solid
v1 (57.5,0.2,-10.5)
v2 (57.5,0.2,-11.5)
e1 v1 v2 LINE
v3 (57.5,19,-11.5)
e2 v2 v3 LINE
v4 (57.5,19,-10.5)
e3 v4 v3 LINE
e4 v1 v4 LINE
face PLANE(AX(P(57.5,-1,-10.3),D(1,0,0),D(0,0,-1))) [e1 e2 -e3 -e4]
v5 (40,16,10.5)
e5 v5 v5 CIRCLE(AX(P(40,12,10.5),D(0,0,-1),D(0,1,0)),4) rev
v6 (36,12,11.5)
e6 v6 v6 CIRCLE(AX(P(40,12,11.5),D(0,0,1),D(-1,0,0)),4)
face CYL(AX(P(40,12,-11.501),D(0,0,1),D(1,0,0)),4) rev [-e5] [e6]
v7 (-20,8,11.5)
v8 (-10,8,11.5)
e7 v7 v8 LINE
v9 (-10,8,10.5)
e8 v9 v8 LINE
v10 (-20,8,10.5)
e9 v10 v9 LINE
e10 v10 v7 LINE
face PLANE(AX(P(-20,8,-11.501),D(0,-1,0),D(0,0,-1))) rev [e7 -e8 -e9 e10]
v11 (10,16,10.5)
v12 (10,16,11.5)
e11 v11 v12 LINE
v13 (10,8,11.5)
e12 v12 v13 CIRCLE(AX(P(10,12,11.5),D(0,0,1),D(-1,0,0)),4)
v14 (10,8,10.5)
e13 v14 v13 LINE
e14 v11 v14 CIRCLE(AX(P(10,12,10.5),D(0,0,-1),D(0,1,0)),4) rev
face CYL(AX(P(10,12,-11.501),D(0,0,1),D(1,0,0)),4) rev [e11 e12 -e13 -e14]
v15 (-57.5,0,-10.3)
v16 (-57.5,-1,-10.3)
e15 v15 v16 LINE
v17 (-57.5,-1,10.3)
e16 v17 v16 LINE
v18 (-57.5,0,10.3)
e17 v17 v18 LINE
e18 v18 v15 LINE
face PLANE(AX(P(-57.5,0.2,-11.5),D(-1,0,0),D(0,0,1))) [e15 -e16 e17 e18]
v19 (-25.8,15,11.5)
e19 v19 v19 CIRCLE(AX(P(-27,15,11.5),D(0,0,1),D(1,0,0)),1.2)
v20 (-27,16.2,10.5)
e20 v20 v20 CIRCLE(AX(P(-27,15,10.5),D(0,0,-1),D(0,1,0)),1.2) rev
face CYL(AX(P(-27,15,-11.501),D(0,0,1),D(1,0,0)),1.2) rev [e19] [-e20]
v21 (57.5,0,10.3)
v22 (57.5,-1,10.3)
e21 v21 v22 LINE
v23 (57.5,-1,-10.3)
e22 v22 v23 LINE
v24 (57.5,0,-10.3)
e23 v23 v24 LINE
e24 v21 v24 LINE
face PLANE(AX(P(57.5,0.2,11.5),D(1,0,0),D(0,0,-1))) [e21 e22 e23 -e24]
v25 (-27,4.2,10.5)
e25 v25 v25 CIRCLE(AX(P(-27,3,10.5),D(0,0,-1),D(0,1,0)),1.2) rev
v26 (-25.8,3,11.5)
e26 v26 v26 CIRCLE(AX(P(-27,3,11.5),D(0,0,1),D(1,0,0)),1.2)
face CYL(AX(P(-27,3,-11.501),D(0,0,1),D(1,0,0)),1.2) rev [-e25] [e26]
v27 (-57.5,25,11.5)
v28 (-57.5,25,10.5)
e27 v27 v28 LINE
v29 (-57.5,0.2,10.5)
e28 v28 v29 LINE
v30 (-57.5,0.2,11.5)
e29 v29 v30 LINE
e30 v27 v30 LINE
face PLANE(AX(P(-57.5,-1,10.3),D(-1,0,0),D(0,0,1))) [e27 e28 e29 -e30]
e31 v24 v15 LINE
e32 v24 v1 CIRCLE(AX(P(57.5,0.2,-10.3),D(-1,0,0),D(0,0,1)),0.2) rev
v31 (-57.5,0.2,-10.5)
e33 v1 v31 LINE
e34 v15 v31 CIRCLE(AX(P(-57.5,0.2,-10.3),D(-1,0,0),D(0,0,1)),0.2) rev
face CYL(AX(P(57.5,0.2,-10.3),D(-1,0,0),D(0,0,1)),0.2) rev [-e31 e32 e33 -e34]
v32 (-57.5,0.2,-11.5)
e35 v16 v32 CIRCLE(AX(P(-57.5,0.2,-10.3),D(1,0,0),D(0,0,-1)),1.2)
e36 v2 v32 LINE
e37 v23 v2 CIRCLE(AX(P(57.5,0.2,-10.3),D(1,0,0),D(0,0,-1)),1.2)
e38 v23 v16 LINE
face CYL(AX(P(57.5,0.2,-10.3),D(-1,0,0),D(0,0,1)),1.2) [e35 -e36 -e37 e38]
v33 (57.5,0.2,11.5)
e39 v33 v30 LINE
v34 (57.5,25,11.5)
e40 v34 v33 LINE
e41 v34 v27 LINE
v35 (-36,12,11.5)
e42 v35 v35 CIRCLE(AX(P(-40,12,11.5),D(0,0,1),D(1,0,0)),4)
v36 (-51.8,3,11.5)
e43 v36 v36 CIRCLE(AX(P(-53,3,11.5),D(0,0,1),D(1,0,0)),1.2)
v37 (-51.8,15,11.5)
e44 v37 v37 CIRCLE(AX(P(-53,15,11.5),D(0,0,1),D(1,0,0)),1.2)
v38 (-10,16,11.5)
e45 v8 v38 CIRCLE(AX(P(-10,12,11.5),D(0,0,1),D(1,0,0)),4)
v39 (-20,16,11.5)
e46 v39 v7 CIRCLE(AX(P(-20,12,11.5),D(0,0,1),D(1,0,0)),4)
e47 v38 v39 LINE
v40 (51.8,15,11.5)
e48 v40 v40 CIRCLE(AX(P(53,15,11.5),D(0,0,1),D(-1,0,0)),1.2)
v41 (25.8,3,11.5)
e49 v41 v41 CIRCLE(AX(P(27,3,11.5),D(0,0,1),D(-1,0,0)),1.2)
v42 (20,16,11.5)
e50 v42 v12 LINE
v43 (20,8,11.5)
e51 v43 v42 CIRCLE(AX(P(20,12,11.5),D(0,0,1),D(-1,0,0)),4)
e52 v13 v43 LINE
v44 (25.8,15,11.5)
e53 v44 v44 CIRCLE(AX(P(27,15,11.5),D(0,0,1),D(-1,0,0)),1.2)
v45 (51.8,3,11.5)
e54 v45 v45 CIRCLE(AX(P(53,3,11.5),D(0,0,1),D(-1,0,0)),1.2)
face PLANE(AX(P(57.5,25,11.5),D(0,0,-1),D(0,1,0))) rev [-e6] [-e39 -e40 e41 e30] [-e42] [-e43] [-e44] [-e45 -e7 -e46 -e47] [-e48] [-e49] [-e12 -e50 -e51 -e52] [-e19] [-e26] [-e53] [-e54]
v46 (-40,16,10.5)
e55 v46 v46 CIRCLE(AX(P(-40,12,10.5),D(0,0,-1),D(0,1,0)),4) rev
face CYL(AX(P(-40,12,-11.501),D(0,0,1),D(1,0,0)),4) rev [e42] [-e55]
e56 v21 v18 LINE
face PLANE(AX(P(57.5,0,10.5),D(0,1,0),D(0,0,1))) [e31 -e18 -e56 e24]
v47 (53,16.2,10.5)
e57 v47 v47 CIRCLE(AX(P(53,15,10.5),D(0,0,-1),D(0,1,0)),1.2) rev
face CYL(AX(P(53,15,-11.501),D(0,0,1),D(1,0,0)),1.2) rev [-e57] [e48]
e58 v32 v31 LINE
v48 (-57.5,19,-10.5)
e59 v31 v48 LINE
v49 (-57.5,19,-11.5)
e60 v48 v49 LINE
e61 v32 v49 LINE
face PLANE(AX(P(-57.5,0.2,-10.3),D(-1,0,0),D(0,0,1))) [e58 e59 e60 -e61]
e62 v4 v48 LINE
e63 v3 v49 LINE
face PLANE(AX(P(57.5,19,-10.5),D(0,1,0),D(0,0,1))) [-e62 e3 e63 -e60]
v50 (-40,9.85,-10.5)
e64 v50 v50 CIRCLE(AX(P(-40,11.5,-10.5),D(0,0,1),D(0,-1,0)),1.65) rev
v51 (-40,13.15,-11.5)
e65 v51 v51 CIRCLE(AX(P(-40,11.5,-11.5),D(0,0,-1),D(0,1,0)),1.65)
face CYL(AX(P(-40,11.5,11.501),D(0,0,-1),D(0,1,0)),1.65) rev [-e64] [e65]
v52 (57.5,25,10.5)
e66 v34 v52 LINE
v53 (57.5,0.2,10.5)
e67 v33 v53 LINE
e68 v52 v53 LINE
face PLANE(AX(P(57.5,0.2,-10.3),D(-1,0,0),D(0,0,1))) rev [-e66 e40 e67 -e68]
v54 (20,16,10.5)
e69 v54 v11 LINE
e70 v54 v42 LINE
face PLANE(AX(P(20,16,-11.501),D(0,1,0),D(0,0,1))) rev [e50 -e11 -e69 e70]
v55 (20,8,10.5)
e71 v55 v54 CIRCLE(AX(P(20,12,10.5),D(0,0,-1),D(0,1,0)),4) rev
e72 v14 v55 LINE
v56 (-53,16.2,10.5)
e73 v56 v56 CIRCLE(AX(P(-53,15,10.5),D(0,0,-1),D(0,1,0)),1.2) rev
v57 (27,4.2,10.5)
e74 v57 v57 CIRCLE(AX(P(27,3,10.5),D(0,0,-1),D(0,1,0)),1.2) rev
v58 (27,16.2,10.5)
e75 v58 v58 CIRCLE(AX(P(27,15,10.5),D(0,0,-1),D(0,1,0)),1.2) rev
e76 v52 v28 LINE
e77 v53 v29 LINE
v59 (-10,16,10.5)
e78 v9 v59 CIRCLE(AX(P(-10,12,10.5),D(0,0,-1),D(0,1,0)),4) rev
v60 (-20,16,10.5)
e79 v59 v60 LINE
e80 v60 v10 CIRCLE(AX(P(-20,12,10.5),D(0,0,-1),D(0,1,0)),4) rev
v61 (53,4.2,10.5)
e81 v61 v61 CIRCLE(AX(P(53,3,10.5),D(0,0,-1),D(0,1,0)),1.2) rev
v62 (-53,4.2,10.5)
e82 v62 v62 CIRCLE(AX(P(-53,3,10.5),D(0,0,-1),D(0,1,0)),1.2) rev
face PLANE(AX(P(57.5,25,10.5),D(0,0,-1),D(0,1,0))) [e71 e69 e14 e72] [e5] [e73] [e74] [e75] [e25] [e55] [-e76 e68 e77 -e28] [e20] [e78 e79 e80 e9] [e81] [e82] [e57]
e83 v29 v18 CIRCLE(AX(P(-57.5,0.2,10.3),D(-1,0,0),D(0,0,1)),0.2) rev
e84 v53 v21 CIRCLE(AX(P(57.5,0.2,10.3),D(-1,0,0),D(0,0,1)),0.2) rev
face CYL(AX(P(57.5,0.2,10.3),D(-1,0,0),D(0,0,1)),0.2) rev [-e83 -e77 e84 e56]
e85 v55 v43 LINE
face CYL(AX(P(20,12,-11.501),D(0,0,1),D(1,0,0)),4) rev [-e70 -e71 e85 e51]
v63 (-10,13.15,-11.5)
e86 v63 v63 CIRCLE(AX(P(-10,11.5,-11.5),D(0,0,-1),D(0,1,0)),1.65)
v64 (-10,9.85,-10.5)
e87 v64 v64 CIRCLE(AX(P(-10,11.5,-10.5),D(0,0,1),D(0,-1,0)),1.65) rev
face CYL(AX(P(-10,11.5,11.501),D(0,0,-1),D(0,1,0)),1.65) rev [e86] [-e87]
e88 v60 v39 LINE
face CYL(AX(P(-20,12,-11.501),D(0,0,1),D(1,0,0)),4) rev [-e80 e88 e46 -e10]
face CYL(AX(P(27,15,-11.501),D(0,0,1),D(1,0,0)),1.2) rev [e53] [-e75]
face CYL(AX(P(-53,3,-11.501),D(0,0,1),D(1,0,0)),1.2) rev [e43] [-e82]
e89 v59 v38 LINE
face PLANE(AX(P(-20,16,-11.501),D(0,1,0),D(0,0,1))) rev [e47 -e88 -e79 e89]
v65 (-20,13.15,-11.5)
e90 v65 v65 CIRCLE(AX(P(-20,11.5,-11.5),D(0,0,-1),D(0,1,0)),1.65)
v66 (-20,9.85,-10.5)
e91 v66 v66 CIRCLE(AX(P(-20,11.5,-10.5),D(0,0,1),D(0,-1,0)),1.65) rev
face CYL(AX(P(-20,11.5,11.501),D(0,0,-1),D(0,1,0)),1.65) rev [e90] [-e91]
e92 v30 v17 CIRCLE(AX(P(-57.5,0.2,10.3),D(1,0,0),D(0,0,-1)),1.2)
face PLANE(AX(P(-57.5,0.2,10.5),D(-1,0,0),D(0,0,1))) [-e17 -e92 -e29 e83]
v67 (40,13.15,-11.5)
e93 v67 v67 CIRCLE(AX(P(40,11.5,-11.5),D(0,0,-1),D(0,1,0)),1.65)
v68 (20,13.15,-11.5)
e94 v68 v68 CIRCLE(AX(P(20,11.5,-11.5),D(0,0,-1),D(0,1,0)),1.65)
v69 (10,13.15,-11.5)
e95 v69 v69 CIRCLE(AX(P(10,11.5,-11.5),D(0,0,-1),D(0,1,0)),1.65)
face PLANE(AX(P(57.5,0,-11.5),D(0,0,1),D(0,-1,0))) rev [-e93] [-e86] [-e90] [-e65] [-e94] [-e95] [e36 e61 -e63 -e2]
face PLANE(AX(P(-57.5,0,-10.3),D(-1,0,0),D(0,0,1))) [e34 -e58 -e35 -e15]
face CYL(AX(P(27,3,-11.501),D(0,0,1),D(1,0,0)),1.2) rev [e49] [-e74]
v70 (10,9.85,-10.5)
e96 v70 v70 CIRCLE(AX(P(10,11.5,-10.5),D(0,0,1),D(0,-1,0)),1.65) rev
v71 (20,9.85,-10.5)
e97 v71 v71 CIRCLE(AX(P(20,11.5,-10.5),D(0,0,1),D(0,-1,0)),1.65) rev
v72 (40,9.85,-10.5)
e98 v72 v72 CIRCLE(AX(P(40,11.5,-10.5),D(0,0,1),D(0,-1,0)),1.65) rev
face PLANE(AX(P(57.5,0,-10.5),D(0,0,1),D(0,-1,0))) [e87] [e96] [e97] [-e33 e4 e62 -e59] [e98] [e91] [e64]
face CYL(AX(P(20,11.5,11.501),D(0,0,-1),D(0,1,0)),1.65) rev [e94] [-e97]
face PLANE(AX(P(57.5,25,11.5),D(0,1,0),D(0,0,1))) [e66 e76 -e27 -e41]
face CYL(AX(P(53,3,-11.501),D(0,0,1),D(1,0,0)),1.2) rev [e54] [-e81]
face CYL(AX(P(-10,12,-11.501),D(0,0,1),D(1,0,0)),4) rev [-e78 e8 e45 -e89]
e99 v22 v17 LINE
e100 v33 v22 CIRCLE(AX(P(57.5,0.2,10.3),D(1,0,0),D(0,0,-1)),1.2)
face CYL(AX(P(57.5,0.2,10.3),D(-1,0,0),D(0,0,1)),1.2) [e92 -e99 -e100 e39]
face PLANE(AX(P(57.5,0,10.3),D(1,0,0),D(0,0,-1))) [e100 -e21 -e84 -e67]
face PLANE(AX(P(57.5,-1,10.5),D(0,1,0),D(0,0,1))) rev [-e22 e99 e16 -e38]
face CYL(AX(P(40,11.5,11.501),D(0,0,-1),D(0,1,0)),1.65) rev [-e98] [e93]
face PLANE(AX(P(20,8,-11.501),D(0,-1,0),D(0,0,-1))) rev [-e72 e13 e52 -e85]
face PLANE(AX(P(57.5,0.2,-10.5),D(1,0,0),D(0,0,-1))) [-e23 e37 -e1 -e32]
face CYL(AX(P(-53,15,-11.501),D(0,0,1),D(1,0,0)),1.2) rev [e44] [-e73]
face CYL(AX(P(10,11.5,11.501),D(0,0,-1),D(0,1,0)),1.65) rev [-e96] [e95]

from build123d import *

# Parameters (mm, degrees)
BASIS_BLECH1_DEPTH              = 57.5
SCHNITT_LINEAR_AUSTRAGEN1_REACH = 68.785
SKIZZE6_R                       = 4
SKIZZE6_R_2                     = 1.2
SCHNITT_LINEAR_AUSTRAGEN2_REACH = 68.785
SKIZZE7_R                       = 1.65


# Sheet-metal steps are written as plain solids
with BuildPart() as part:
    # Skizze1 → Basis-Blech1 (new, symmetric)
    with BuildSketch(Plane(origin=(0, 0, 0), x_dir=(0, 0, -1), z_dir=(1, 0, 0))):
        with BuildLine():
            Line((-10.5, 25), (-10.5, 0.2))
            ThreePointArc((-10.5, 0.2), (-10.441421356, 0.058578644), (-10.3, 0))
            Line((-10.3, 0), (10.3, 0))
            ThreePointArc((10.3, 0), (10.441421356, 0.058578644), (10.5, 0.2))
            Line((10.5, 0.2), (10.5, 19))
            Line((10.5, 19), (11.5, 19))
            Line((11.5, 19), (11.5, 0.2))
            ThreePointArc((11.5, 0.2), (11.148528137, -0.648528137), (10.3, -1))
            Line((10.3, -1), (-10.3, -1))
            ThreePointArc((-10.3, -1), (-11.148528137, -0.648528137), (-11.5, 0.2))
            Line((-11.5, 0.2), (-11.5, 25))
            Line((-11.5, 25), (-10.5, 25))
        make_face()
    extrude(amount=BASIS_BLECH1_DEPTH, both=True)

    # Skizze6 → Schnitt-Linear austragen1 (cut, up to next)
    with BuildSketch(Plane.XY.offset(11.5), mode=Mode.PRIVATE) as schnitt_linear_austragen1_sk1:
        with Locations((-40, 12)):
            Circle(SKIZZE6_R)
    schnitt_linear_austragen1_tool1 = extrude(schnitt_linear_austragen1_sk1.sketch, amount=-SCHNITT_LINEAR_AUSTRAGEN1_REACH, mode=Mode.PRIVATE) & part.part
    # Skizze6 → Schnitt-Linear austragen1 (cut, up to next)
    with BuildSketch(Plane.XY.offset(11.5), mode=Mode.PRIVATE) as schnitt_linear_austragen1_sk2:
        with Locations((-53, 15)):
            Circle(SKIZZE6_R_2)
    schnitt_linear_austragen1_tool2 = extrude(schnitt_linear_austragen1_sk2.sketch, amount=-SCHNITT_LINEAR_AUSTRAGEN1_REACH, mode=Mode.PRIVATE) & part.part
    # Skizze6 → Schnitt-Linear austragen1 (cut, up to next)
    with BuildSketch(Plane.XY.offset(11.5), mode=Mode.PRIVATE) as schnitt_linear_austragen1_sk3:
        with Locations((-53, 3)):
            Circle(SKIZZE6_R_2)
    schnitt_linear_austragen1_tool3 = extrude(schnitt_linear_austragen1_sk3.sketch, amount=-SCHNITT_LINEAR_AUSTRAGEN1_REACH, mode=Mode.PRIVATE) & part.part
    # Skizze6 → Schnitt-Linear austragen1 (cut, up to next)
    with BuildSketch(Plane.XY.offset(11.5), mode=Mode.PRIVATE) as schnitt_linear_austragen1_sk4:
        with Locations((-27, 15)):
            Circle(SKIZZE6_R_2)
    schnitt_linear_austragen1_tool4 = extrude(schnitt_linear_austragen1_sk4.sketch, amount=-SCHNITT_LINEAR_AUSTRAGEN1_REACH, mode=Mode.PRIVATE) & part.part
    # Skizze6 → Schnitt-Linear austragen1 (cut, up to next)
    with BuildSketch(Plane.XY.offset(11.5), mode=Mode.PRIVATE) as schnitt_linear_austragen1_sk5:
        with Locations((-27, 3)):
            Circle(SKIZZE6_R_2)
    schnitt_linear_austragen1_tool5 = extrude(schnitt_linear_austragen1_sk5.sketch, amount=-SCHNITT_LINEAR_AUSTRAGEN1_REACH, mode=Mode.PRIVATE) & part.part
    # Skizze6 → Schnitt-Linear austragen1 (cut, up to next)
    with BuildSketch(Plane.XY.offset(11.5), mode=Mode.PRIVATE) as schnitt_linear_austragen1_sk6:
        with Locations(Location((53, 3, 0), (0, 0, 90))):
            Circle(SKIZZE6_R_2)
    schnitt_linear_austragen1_tool6 = extrude(schnitt_linear_austragen1_sk6.sketch, amount=-SCHNITT_LINEAR_AUSTRAGEN1_REACH, mode=Mode.PRIVATE) & part.part
    # Skizze6 → Schnitt-Linear austragen1 (cut, up to next)
    with BuildSketch(Plane.XY.offset(11.5), mode=Mode.PRIVATE) as schnitt_linear_austragen1_sk7:
        with Locations(Location((27, 3, 0), (0, 0, 90))):
            Circle(SKIZZE6_R_2)
    schnitt_linear_austragen1_tool7 = extrude(schnitt_linear_austragen1_sk7.sketch, amount=-SCHNITT_LINEAR_AUSTRAGEN1_REACH, mode=Mode.PRIVATE) & part.part
    # Skizze6 → Schnitt-Linear austragen1 (cut, up to next)
    with BuildSketch(Plane.XY.offset(11.5), mode=Mode.PRIVATE) as schnitt_linear_austragen1_sk8:
        with Locations(Location((27, 15, 0), (0, 0, 90))):
            Circle(SKIZZE6_R_2)
    schnitt_linear_austragen1_tool8 = extrude(schnitt_linear_austragen1_sk8.sketch, amount=-SCHNITT_LINEAR_AUSTRAGEN1_REACH, mode=Mode.PRIVATE) & part.part
    # Skizze6 → Schnitt-Linear austragen1 (cut, up to next)
    with BuildSketch(Plane.XY.offset(11.5), mode=Mode.PRIVATE) as schnitt_linear_austragen1_sk9:
        with Locations(Location((40, 12, 0), (0, 0, 90))):
            Circle(SKIZZE6_R)
    schnitt_linear_austragen1_tool9 = extrude(schnitt_linear_austragen1_sk9.sketch, amount=-SCHNITT_LINEAR_AUSTRAGEN1_REACH, mode=Mode.PRIVATE) & part.part
    # Skizze6 → Schnitt-Linear austragen1 (cut, up to next)
    with BuildSketch(Plane.XY.offset(11.5), mode=Mode.PRIVATE) as schnitt_linear_austragen1_sk10:
        with Locations(Location((53, 15, 0), (0, 0, 90))):
            Circle(SKIZZE6_R_2)
    schnitt_linear_austragen1_tool10 = extrude(schnitt_linear_austragen1_sk10.sketch, amount=-SCHNITT_LINEAR_AUSTRAGEN1_REACH, mode=Mode.PRIVATE) & part.part
    # Skizze6 → Schnitt-Linear austragen1 (cut, up to next)
    with BuildSketch(Plane.XY.offset(11.5), mode=Mode.PRIVATE) as schnitt_linear_austragen1_sk11:
        with BuildLine():
            Line((-20, 16), (-10, 16))
            ThreePointArc((-10, 16), (-6, 12), (-10, 8))
            Line((-10, 8), (-20, 8))
            ThreePointArc((-20, 8), (-24, 12), (-20, 16))
        make_face()
    schnitt_linear_austragen1_tool11 = extrude(schnitt_linear_austragen1_sk11.sketch, amount=-SCHNITT_LINEAR_AUSTRAGEN1_REACH, mode=Mode.PRIVATE) & part.part
    # Skizze6 → Schnitt-Linear austragen1 (cut, up to next)
    with BuildSketch(Plane.XY.offset(11.5), mode=Mode.PRIVATE) as schnitt_linear_austragen1_sk12:
        with BuildLine():
            Line((20, 16), (10, 16))
            ThreePointArc((10, 16), (6, 12), (10, 8))
            Line((10, 8), (20, 8))
            ThreePointArc((20, 8), (24, 12), (20, 16))
        make_face()
    schnitt_linear_austragen1_tool12 = extrude(schnitt_linear_austragen1_sk12.sketch, amount=-SCHNITT_LINEAR_AUSTRAGEN1_REACH, mode=Mode.PRIVATE) & part.part
    add(schnitt_linear_austragen1_tool1.solids().sort_by_distance((-40, 12, 11.5))[0], mode=Mode.SUBTRACT)
    add(schnitt_linear_austragen1_tool2.solids().sort_by_distance((-53, 15, 11.5))[0], mode=Mode.SUBTRACT)
    add(schnitt_linear_austragen1_tool3.solids().sort_by_distance((-53, 3, 11.5))[0], mode=Mode.SUBTRACT)
    add(schnitt_linear_austragen1_tool4.solids().sort_by_distance((-27, 15, 11.5))[0], mode=Mode.SUBTRACT)
    add(schnitt_linear_austragen1_tool5.solids().sort_by_distance((-27, 3, 11.5))[0], mode=Mode.SUBTRACT)
    add(schnitt_linear_austragen1_tool6.solids().sort_by_distance((53, 3, 11.5))[0], mode=Mode.SUBTRACT)
    add(schnitt_linear_austragen1_tool7.solids().sort_by_distance((27, 3, 11.5))[0], mode=Mode.SUBTRACT)
    add(schnitt_linear_austragen1_tool8.solids().sort_by_distance((27, 15, 11.5))[0], mode=Mode.SUBTRACT)
    add(schnitt_linear_austragen1_tool9.solids().sort_by_distance((40, 12, 11.5))[0], mode=Mode.SUBTRACT)
    add(schnitt_linear_austragen1_tool10.solids().sort_by_distance((53, 15, 11.5))[0], mode=Mode.SUBTRACT)
    add(schnitt_linear_austragen1_tool11.solids().sort_by_distance((-15, 12, 11.5))[0], mode=Mode.SUBTRACT)
    add(schnitt_linear_austragen1_tool12.solids().sort_by_distance((15, 12, 11.5))[0], mode=Mode.SUBTRACT)

    # Skizze7 → Schnitt-Linear austragen2 (cut, up to next)
    with BuildSketch(Plane(origin=(0, 0, -11.5), x_dir=(-1, 0, 0), z_dir=(0, 0, -1)), mode=Mode.PRIVATE) as schnitt_linear_austragen2_sk1:
        with Locations(Location((-40, 11.5, 0), (0, 0, 90))):
            Circle(SKIZZE7_R)
    schnitt_linear_austragen2_tool1 = extrude(schnitt_linear_austragen2_sk1.sketch, amount=-SCHNITT_LINEAR_AUSTRAGEN2_REACH, mode=Mode.PRIVATE) & part.part
    # Skizze7 → Schnitt-Linear austragen2 (cut, up to next)
    with BuildSketch(Plane(origin=(0, 0, -11.5), x_dir=(-1, 0, 0), z_dir=(0, 0, -1)), mode=Mode.PRIVATE) as schnitt_linear_austragen2_sk2:
        with Locations(Location((-20, 11.5, 0), (0, 0, 90))):
            Circle(SKIZZE7_R)
    schnitt_linear_austragen2_tool2 = extrude(schnitt_linear_austragen2_sk2.sketch, amount=-SCHNITT_LINEAR_AUSTRAGEN2_REACH, mode=Mode.PRIVATE) & part.part
    # Skizze7 → Schnitt-Linear austragen2 (cut, up to next)
    with BuildSketch(Plane(origin=(0, 0, -11.5), x_dir=(-1, 0, 0), z_dir=(0, 0, -1)), mode=Mode.PRIVATE) as schnitt_linear_austragen2_sk3:
        with Locations(Location((-10, 11.5, 0), (0, 0, 90))):
            Circle(SKIZZE7_R)
    schnitt_linear_austragen2_tool3 = extrude(schnitt_linear_austragen2_sk3.sketch, amount=-SCHNITT_LINEAR_AUSTRAGEN2_REACH, mode=Mode.PRIVATE) & part.part
    # Skizze7 → Schnitt-Linear austragen2 (cut, up to next)
    with BuildSketch(Plane(origin=(0, 0, -11.5), x_dir=(-1, 0, 0), z_dir=(0, 0, -1)), mode=Mode.PRIVATE) as schnitt_linear_austragen2_sk4:
        with Locations(Location((10, 11.5, 0), (0, 0, 90))):
            Circle(SKIZZE7_R)
    schnitt_linear_austragen2_tool4 = extrude(schnitt_linear_austragen2_sk4.sketch, amount=-SCHNITT_LINEAR_AUSTRAGEN2_REACH, mode=Mode.PRIVATE) & part.part
    # Skizze7 → Schnitt-Linear austragen2 (cut, up to next)
    with BuildSketch(Plane(origin=(0, 0, -11.5), x_dir=(-1, 0, 0), z_dir=(0, 0, -1)), mode=Mode.PRIVATE) as schnitt_linear_austragen2_sk5:
        with Locations(Location((20, 11.5, 0), (0, 0, 90))):
            Circle(SKIZZE7_R)
    schnitt_linear_austragen2_tool5 = extrude(schnitt_linear_austragen2_sk5.sketch, amount=-SCHNITT_LINEAR_AUSTRAGEN2_REACH, mode=Mode.PRIVATE) & part.part
    # Skizze7 → Schnitt-Linear austragen2 (cut, up to next)
    with BuildSketch(Plane(origin=(0, 0, -11.5), x_dir=(-1, 0, 0), z_dir=(0, 0, -1)), mode=Mode.PRIVATE) as schnitt_linear_austragen2_sk6:
        with Locations(Location((40, 11.5, 0), (0, 0, 90))):
            Circle(SKIZZE7_R)
    schnitt_linear_austragen2_tool6 = extrude(schnitt_linear_austragen2_sk6.sketch, amount=-SCHNITT_LINEAR_AUSTRAGEN2_REACH, mode=Mode.PRIVATE) & part.part
    add(schnitt_linear_austragen2_tool1.solids().sort_by_distance((40, 11.5, -11.5))[0], mode=Mode.SUBTRACT)
    add(schnitt_linear_austragen2_tool2.solids().sort_by_distance((20, 11.5, -11.5))[0], mode=Mode.SUBTRACT)
    add(schnitt_linear_austragen2_tool3.solids().sort_by_distance((10, 11.5, -11.5))[0], mode=Mode.SUBTRACT)
    add(schnitt_linear_austragen2_tool4.solids().sort_by_distance((-10, 11.5, -11.5))[0], mode=Mode.SUBTRACT)
    add(schnitt_linear_austragen2_tool5.solids().sort_by_distance((-20, 11.5, -11.5))[0], mode=Mode.SUBTRACT)
    add(schnitt_linear_austragen2_tool6.solids().sort_by_distance((-40, 11.5, -11.5))[0], mode=Mode.SUBTRACT)


solid = part.part
